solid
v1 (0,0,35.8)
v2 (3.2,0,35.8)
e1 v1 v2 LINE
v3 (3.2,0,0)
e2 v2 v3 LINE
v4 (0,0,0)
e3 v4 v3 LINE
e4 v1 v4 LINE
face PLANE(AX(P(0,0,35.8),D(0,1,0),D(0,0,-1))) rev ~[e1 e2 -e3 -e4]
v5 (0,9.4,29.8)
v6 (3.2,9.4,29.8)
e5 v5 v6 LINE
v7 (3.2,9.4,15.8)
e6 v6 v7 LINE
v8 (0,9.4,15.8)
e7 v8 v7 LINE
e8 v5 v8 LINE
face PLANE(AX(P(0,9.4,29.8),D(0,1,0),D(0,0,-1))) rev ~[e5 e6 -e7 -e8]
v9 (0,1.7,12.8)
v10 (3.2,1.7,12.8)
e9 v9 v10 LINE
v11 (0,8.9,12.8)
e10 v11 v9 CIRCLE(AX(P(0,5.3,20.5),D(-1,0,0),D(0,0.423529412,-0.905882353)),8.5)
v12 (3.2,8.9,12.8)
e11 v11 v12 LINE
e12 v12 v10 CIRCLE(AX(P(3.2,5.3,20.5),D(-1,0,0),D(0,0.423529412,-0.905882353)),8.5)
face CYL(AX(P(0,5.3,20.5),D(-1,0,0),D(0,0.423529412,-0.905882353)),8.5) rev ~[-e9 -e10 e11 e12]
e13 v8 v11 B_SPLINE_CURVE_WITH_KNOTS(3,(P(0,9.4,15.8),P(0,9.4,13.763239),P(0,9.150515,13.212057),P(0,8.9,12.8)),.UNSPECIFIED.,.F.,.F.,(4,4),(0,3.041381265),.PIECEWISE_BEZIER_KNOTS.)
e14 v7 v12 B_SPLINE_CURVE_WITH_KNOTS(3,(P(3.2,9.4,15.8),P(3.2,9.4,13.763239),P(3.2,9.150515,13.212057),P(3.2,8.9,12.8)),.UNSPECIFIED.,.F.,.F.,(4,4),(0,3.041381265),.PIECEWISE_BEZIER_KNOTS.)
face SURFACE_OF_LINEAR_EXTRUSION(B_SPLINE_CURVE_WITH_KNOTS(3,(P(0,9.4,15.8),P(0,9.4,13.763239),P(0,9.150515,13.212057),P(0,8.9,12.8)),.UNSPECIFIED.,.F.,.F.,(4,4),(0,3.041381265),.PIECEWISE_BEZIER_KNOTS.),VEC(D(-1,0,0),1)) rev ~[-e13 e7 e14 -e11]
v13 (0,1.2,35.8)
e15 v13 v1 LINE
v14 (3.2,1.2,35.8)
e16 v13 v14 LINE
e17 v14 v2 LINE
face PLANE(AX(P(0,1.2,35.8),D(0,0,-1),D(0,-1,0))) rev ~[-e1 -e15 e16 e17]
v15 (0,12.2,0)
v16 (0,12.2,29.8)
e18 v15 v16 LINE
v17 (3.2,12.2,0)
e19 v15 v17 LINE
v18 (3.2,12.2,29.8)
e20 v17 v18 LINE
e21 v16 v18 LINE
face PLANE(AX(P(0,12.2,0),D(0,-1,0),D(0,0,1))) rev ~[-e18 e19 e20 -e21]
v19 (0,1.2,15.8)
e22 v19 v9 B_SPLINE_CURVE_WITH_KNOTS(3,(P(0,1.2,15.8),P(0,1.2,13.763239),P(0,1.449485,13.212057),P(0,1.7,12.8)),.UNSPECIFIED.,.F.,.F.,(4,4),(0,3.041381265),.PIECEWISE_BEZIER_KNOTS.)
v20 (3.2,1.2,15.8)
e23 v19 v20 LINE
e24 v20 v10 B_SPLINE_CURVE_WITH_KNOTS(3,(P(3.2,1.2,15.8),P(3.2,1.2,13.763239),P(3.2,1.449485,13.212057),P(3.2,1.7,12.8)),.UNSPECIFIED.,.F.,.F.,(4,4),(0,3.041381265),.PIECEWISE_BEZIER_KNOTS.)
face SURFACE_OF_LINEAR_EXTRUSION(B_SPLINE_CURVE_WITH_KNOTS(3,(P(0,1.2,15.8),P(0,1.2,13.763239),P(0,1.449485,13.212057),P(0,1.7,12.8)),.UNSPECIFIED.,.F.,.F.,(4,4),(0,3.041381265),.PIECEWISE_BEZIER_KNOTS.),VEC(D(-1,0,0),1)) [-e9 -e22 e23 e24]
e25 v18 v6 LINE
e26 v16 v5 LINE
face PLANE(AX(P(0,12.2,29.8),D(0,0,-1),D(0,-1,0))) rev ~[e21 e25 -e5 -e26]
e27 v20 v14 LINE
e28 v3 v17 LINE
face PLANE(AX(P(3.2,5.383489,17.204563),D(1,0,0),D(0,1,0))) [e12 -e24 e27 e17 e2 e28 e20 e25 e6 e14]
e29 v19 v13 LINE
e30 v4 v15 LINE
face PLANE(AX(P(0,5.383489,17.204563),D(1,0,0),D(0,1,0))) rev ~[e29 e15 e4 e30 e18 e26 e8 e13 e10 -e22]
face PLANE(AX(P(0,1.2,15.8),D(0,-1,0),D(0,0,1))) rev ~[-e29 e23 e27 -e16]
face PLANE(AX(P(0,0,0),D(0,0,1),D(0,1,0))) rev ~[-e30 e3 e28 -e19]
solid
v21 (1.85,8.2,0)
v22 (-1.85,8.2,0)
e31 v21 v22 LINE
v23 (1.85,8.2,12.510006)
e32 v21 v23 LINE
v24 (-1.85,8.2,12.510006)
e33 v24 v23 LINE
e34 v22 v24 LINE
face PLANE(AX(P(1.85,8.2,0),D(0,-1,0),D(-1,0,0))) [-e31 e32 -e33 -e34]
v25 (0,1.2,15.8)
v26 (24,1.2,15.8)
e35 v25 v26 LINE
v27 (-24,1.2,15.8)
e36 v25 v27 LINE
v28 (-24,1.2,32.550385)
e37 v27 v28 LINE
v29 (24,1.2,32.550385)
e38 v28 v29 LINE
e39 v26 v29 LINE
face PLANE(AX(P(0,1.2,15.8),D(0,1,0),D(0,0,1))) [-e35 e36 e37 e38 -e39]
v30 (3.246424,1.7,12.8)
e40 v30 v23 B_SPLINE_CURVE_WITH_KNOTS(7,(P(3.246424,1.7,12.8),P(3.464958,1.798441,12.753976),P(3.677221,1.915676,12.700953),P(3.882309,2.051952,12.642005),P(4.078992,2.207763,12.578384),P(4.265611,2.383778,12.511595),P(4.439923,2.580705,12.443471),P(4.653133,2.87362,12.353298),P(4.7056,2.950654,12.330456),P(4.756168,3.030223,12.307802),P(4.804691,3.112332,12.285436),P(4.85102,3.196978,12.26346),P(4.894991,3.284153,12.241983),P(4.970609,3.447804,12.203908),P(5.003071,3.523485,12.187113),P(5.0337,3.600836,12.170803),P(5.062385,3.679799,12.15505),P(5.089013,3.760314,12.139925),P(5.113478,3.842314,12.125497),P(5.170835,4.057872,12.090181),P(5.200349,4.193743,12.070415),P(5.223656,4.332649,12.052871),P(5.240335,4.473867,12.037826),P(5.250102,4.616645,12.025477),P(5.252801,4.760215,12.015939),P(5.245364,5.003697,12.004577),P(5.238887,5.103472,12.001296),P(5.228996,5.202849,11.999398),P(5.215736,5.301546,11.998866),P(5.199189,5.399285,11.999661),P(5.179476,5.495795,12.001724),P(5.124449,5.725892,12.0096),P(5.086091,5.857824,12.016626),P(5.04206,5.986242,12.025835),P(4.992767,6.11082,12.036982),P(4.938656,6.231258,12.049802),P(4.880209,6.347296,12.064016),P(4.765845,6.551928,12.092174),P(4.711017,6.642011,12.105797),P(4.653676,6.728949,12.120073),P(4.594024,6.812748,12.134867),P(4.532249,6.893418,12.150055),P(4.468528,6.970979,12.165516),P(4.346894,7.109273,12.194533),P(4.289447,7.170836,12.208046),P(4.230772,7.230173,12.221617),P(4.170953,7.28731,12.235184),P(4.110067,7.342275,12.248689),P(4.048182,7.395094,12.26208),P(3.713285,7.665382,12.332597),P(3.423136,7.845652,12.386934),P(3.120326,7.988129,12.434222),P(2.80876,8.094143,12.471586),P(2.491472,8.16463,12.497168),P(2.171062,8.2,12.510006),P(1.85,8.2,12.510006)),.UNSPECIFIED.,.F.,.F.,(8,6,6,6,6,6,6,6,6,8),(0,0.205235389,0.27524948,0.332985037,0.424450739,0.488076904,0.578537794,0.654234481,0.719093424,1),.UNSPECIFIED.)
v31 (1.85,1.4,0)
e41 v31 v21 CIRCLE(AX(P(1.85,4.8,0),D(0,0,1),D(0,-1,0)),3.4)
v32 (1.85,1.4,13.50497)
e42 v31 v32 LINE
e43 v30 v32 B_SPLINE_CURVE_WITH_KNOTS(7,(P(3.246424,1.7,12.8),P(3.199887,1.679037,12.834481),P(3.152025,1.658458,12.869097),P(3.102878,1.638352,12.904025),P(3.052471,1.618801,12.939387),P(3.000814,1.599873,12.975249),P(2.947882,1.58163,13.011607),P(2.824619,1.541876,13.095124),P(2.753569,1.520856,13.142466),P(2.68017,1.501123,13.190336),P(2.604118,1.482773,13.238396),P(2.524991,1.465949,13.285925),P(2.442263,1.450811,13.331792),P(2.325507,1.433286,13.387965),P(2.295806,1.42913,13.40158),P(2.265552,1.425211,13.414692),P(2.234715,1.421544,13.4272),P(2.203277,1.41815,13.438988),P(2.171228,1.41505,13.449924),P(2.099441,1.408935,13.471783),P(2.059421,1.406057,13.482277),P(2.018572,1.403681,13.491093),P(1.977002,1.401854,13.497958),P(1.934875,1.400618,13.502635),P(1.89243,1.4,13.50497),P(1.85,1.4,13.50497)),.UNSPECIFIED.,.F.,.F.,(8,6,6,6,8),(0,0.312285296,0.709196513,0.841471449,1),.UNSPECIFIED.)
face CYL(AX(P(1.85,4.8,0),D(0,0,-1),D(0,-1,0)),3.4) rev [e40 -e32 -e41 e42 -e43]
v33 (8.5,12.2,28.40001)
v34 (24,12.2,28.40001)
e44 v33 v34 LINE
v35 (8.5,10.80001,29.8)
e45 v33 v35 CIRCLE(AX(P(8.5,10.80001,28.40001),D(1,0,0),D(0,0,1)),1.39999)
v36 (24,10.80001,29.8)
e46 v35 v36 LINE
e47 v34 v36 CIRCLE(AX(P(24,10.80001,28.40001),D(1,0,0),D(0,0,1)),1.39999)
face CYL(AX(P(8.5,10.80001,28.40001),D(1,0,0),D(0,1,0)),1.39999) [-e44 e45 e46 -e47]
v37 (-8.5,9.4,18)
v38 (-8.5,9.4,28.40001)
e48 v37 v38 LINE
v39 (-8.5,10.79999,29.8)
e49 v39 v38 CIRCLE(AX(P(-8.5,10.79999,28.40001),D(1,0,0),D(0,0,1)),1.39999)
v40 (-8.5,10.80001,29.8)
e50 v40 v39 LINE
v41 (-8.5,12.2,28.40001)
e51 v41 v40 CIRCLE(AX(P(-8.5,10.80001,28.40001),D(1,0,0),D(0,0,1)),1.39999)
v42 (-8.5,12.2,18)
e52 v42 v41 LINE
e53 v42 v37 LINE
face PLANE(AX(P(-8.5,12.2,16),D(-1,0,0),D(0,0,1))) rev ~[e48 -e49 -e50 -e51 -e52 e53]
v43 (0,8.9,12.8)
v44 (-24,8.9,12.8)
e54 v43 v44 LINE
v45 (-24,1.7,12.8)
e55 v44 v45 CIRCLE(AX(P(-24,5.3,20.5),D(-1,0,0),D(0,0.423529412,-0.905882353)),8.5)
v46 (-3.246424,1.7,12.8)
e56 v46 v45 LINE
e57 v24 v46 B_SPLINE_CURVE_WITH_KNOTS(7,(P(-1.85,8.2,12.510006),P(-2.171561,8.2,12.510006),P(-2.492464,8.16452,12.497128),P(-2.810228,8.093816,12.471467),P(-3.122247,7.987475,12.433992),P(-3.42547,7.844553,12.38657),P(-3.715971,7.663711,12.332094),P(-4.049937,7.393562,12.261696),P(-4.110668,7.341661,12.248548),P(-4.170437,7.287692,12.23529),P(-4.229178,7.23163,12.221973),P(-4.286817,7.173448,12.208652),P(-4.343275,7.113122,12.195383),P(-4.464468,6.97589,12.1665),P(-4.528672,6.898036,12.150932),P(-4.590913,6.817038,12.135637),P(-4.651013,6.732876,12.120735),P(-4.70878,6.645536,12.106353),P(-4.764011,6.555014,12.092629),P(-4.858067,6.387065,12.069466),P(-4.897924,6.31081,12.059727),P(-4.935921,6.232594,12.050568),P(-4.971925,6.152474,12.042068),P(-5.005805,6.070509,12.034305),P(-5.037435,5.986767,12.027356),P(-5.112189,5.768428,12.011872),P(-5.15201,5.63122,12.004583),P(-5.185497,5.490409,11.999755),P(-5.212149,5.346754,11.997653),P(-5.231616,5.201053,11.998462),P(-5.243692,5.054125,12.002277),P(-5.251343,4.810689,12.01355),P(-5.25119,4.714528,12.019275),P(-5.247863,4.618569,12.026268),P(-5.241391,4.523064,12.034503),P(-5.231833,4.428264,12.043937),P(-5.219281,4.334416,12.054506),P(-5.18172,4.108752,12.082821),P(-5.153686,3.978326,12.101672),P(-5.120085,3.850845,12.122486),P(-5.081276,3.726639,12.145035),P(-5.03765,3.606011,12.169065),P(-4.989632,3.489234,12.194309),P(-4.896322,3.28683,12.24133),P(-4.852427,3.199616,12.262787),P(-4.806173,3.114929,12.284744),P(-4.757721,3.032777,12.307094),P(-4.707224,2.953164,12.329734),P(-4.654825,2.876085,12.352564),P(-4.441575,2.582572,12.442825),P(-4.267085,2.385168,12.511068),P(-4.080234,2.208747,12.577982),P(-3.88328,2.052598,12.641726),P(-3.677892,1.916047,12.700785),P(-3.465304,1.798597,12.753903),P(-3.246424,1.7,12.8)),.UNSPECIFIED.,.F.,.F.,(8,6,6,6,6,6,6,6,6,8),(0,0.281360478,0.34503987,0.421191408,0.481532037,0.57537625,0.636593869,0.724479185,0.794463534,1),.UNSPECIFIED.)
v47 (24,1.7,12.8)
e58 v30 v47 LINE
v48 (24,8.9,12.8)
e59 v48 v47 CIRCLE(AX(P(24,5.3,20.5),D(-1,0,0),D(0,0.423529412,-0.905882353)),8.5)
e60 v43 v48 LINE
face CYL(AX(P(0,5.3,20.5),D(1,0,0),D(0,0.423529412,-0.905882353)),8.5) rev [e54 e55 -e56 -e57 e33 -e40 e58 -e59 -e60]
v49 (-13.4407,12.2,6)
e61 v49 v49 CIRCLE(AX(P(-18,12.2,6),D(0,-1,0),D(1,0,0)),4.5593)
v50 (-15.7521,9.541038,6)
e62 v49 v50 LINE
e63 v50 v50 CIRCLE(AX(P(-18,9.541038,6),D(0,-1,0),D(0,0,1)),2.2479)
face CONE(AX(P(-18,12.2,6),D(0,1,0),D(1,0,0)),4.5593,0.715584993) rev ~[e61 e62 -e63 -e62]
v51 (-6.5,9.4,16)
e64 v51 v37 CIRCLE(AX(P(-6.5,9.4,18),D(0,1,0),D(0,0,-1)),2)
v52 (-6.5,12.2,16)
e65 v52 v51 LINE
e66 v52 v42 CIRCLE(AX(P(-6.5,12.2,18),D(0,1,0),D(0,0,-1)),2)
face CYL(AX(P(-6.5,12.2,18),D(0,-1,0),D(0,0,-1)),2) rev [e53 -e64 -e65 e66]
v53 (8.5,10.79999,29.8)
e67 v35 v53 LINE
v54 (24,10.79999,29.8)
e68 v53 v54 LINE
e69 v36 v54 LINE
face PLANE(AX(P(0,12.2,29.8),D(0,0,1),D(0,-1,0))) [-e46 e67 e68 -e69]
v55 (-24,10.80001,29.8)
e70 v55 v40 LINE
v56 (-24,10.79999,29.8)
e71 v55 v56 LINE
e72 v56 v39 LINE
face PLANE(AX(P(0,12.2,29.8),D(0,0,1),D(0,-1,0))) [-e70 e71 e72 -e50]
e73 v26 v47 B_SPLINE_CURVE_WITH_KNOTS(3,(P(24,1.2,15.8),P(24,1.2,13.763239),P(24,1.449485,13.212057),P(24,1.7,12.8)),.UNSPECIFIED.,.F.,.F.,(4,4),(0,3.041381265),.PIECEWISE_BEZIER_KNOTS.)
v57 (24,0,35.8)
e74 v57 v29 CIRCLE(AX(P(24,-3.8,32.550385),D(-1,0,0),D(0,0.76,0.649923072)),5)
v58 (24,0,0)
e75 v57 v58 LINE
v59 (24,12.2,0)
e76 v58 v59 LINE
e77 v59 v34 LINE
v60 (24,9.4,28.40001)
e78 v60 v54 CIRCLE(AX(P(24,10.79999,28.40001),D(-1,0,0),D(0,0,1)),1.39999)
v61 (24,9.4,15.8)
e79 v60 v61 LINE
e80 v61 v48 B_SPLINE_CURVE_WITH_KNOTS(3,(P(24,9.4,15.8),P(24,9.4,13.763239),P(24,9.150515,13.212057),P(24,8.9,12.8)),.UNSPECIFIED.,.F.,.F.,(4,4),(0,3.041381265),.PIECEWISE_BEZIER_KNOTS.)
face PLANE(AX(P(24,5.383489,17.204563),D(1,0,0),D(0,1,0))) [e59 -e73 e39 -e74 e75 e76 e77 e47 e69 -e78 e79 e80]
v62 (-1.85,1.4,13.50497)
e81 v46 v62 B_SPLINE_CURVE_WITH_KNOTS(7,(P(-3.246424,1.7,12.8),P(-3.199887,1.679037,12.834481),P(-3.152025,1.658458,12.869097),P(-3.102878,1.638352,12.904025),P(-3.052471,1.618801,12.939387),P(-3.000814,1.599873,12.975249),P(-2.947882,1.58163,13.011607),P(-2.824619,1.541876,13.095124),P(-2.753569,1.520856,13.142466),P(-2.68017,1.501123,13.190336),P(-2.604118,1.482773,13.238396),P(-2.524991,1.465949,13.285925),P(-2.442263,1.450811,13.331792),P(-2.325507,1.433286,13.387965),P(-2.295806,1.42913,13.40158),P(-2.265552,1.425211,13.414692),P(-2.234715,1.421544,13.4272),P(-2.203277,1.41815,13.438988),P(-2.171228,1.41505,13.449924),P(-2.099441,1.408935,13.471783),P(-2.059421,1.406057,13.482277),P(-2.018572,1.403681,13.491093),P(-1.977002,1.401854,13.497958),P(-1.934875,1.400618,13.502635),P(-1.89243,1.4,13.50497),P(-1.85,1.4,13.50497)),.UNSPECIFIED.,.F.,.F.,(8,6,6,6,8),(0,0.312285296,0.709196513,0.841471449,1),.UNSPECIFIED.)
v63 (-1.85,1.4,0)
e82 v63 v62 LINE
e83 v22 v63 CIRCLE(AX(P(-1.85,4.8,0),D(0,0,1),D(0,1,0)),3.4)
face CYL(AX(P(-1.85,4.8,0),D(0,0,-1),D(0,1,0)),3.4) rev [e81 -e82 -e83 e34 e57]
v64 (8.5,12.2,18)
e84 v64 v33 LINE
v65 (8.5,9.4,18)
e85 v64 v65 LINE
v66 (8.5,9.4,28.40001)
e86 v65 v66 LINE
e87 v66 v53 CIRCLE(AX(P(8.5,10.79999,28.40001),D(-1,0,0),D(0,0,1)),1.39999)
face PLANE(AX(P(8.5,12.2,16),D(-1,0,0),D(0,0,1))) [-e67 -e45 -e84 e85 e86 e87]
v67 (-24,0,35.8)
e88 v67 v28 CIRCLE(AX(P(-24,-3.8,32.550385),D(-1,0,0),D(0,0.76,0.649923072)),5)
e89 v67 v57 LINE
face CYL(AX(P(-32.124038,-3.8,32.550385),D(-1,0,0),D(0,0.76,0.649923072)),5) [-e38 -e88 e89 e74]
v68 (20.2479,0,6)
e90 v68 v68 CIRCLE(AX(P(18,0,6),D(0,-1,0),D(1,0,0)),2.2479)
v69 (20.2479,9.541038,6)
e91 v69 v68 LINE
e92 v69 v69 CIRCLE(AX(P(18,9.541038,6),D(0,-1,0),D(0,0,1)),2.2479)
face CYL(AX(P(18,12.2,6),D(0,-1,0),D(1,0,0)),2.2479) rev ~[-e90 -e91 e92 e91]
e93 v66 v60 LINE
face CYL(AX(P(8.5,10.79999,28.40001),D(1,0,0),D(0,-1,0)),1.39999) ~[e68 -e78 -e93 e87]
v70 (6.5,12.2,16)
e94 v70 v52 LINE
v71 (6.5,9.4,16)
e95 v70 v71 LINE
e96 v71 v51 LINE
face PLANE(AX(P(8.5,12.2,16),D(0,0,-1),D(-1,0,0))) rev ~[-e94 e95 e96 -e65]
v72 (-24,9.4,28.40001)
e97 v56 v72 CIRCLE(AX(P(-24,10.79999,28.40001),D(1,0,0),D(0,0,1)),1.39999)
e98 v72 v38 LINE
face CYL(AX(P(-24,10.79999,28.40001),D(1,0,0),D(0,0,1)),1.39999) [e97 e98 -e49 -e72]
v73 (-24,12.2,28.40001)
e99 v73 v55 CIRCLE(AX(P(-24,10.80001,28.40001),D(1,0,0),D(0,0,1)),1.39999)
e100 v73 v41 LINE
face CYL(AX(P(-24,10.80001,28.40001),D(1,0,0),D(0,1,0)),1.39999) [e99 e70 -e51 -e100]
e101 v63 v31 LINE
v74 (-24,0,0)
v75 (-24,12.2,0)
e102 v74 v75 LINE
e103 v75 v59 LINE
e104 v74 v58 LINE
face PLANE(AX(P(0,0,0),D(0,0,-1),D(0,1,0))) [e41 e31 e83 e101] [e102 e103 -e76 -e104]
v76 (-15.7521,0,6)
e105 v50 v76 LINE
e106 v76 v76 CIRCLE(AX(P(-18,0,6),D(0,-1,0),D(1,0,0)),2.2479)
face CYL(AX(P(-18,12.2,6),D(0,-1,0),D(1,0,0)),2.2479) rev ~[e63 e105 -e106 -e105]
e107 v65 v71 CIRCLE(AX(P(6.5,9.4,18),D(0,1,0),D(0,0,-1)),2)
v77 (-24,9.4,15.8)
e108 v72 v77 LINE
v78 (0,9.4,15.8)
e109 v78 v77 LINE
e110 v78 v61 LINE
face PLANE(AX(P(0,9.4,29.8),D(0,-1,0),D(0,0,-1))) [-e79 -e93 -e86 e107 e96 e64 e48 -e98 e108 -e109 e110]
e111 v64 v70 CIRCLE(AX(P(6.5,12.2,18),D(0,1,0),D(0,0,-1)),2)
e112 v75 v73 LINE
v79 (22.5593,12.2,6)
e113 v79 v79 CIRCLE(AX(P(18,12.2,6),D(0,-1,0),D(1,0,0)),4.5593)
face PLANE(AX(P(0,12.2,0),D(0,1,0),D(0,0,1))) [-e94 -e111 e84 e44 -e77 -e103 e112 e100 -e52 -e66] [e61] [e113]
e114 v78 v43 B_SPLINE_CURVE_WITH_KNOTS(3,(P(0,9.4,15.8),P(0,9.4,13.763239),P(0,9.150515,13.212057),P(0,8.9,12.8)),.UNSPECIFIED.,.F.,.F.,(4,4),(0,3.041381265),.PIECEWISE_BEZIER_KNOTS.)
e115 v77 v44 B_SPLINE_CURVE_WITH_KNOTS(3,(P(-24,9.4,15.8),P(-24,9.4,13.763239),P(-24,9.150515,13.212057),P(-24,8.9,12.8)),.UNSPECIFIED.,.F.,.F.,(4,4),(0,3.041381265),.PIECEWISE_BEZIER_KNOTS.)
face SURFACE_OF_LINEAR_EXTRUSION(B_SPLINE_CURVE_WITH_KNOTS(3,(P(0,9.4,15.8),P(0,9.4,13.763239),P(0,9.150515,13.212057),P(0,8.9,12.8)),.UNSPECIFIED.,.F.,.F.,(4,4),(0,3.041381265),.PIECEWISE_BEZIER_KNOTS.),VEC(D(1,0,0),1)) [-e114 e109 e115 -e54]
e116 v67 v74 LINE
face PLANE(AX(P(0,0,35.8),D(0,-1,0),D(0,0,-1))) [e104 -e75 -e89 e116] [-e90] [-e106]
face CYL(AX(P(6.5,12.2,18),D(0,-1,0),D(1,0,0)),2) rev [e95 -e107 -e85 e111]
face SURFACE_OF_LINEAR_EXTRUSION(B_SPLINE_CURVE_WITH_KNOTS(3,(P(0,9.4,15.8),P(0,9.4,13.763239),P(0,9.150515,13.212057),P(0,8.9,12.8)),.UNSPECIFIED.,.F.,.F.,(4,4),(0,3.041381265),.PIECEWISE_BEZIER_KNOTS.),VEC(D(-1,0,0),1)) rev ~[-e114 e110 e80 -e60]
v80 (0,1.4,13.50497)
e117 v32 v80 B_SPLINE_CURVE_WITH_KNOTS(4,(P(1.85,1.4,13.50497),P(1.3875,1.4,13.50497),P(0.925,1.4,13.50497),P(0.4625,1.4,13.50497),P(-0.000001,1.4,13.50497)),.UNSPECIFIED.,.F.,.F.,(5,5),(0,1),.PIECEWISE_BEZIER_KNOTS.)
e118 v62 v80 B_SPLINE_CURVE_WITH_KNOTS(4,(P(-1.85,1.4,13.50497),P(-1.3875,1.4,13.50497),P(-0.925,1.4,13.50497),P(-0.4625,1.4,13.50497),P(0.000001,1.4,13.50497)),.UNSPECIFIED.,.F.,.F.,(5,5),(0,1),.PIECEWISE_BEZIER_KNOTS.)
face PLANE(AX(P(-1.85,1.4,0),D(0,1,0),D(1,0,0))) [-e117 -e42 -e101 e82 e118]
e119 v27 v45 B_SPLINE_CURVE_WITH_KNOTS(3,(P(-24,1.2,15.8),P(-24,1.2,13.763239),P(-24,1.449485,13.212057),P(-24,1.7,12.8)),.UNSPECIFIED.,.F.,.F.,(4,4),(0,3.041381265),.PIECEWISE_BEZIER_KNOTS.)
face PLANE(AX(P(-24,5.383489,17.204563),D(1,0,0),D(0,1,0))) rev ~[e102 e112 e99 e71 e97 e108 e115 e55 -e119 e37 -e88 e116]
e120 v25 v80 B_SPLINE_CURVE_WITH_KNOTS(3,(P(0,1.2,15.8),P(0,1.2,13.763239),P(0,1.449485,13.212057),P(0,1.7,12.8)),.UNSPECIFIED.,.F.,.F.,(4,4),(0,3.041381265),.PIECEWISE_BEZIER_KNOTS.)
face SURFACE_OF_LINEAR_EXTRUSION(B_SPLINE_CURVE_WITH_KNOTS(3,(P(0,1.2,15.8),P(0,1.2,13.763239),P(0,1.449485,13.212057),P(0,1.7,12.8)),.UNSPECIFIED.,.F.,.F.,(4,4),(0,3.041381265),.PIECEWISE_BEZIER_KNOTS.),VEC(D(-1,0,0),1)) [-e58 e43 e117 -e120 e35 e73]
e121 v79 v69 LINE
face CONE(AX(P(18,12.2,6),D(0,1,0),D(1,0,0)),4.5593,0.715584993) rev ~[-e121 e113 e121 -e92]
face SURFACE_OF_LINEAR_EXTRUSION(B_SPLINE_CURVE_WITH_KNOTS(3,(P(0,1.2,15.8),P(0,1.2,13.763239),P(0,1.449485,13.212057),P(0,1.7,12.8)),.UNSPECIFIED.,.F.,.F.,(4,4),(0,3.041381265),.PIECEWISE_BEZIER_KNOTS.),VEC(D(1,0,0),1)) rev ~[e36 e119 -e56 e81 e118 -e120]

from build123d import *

# Parameters (mm, degrees)
F1_DEPTH        = 3.2
F2_DEPTH        = 24
F4_DEPTH        = 35.8010001
F5_W            = 17
F5_H            = 13.8
F6_DEPTH        = 2.8
F7_R            = 1.39999
F8_T1_DEPTH     = 64.2480768093
F9_R            = 2
F10_D           = 4.4958
F10_CSINK_D     = 9.1186
F10_CSINK_ANGLE = 82


# Not quite as in the source:
# - a fillet or chamfer that OpenCascade refuses, or shapes differently, is made with other operations: its cross-section is extruded or revolved along the edge and cut away or added
# - a fillet or chamfer is up to 0.001 mm smaller than in the source, because OpenCascade refuses the exact size


with BuildPart() as f1:
    # F0 (on Right) → F1 (new body)
    with BuildSketch(Plane.YZ):
        with BuildLine():
            Line((1.2, 15.8), (1.2, 35.8))
            Line((1.2, 35.8), (0, 35.8))
            Line((0, 35.8), (0, 0))
            Line((0, 0), (12.2, 0))
            Line((12.2, 0), (12.2, 29.8))
            Line((12.2, 29.8), (9.4, 29.8))
            Line((9.4, 29.8), (9.4, 15.8))
            add(Edge.make_bspline(
                [(9.4, 15.8), (9.4, 13.7632392675), (9.1505151562, 13.2120574221), (8.9, 12.8)],
                knots=[0, 0, 0, 0, 3.0413812651, 3.0413812651, 3.0413812651, 3.0413812651], degree=3))
            ThreePointArc((8.9, 12.8), (5.3, 12), (1.7, 12.8))
            add(Edge.make_bspline(
                [(1.2, 15.8), (1.2, 13.7632392675), (1.4494848438, 13.2120574221), (1.7, 12.8)],
                knots=[0, 0, 0, 0, 3.0413812651, 3.0413812651, 3.0413812651, 3.0413812651], degree=3))
        make_face()
    extrude(amount=F1_DEPTH)


with BuildPart() as f2:
    # F0 (on Right) → F2 (new body, symmetric)
    with BuildSketch(Plane.YZ):
        with BuildLine():
            Line((1.2, 15.8), (1.2, 35.8))
            Line((1.2, 35.8), (0, 35.8))
            Line((0, 35.8), (0, 0))
            Line((0, 0), (12.2, 0))
            Line((12.2, 0), (12.2, 29.8))
            Line((12.2, 29.8), (9.4, 29.8))
            Line((9.4, 29.8), (9.4, 15.8))
            add(Edge.make_bspline(
                [(9.4, 15.8), (9.4, 13.7632392675), (9.1505151562, 13.2120574221), (8.9, 12.8)],
                knots=[0, 0, 0, 0, 3.0413812651, 3.0413812651, 3.0413812651, 3.0413812651], degree=3))
            ThreePointArc((8.9, 12.8), (5.3, 12), (1.7, 12.8))
            add(Edge.make_bspline(
                [(1.2, 15.8), (1.2, 13.7632392675), (1.4494848438, 13.2120574221), (1.7, 12.8)],
                knots=[0, 0, 0, 0, 3.0413812651, 3.0413812651, 3.0413812651, 3.0413812651], degree=3))
        make_face()
    extrude(amount=F2_DEPTH, both=True)

    # F3 (on Top) → F4 (cut, through all)
    with BuildSketch(Plane.XY):
        with BuildLine():
            Line((1.85, 8.2), (-1.85, 8.2))
            ThreePointArc((-1.85, 8.2), (-5.25, 4.8), (-1.85, 1.4))
            Line((-1.85, 1.4), (1.85, 1.4))
            ThreePointArc((1.85, 1.4), (5.25, 4.8), (1.85, 8.2))
        make_face()
    extrude(amount=F4_DEPTH, mode=Mode.SUBTRACT)

    # F5 (on face) → F6 (cut, through all)
    with BuildSketch(Plane(origin=(0, 12.2, 0), x_dir=(-1, 0, 0), z_dir=(0, 1, 0))):
        with Locations((0, 22.9)):
            Rectangle(F5_W, F5_H)
    extrude(amount=-F6_DEPTH, mode=Mode.SUBTRACT)

    # F7 (radius 1.4 in the source; OpenCascade refuses exactly that, so slightly less here)
    f7_edges = [f2.edges().sort_by_distance(p)[0] for p in [
        (16.25, 12.2, 29.8),
        (-16.25, 12.2, 29.8),
        (-16.25, 9.4, 29.8),
        (16.25, 9.4, 29.8),
    ]]
    fillet(f7_edges, radius=F7_R)

    # F8: fillet of radius 5 on 1 edges, made by hand

    # F8_s2 → F8_t1 (cut)
    with BuildSketch(Plane.YZ.offset(-32.1240384046)):
        with BuildLine():
            ThreePointArc((0, 35.8), (0.8904157598, 34.2824354457), (1.2, 32.5503846381))
            Line((1.2, 32.5503846381), (1.2, 35.8))
            Line((1.2, 35.8), (0, 35.8))
        make_face()
    extrude(amount=F8_T1_DEPTH, mode=Mode.SUBTRACT)

    # F9
    f9_edges = [f2.edges().sort_by_distance(p)[0] for p in [
        (8.5, 10.8, 16),
        (-8.5, 10.8, 16),
    ]]
    fillet(f9_edges, radius=F9_R)

    # F10 (through all)
    with Locations(Plane(origin=(0, 12.2, 0), x_dir=(-1, 0, 0), z_dir=(0, 1, 0))):
        with Locations((-18, 6), (18, 6)):
            CounterSinkHole(F10_D / 2, F10_CSINK_D / 2, counter_sink_angle=F10_CSINK_ANGLE)


solid = Compound([f1.part, f2.part])
